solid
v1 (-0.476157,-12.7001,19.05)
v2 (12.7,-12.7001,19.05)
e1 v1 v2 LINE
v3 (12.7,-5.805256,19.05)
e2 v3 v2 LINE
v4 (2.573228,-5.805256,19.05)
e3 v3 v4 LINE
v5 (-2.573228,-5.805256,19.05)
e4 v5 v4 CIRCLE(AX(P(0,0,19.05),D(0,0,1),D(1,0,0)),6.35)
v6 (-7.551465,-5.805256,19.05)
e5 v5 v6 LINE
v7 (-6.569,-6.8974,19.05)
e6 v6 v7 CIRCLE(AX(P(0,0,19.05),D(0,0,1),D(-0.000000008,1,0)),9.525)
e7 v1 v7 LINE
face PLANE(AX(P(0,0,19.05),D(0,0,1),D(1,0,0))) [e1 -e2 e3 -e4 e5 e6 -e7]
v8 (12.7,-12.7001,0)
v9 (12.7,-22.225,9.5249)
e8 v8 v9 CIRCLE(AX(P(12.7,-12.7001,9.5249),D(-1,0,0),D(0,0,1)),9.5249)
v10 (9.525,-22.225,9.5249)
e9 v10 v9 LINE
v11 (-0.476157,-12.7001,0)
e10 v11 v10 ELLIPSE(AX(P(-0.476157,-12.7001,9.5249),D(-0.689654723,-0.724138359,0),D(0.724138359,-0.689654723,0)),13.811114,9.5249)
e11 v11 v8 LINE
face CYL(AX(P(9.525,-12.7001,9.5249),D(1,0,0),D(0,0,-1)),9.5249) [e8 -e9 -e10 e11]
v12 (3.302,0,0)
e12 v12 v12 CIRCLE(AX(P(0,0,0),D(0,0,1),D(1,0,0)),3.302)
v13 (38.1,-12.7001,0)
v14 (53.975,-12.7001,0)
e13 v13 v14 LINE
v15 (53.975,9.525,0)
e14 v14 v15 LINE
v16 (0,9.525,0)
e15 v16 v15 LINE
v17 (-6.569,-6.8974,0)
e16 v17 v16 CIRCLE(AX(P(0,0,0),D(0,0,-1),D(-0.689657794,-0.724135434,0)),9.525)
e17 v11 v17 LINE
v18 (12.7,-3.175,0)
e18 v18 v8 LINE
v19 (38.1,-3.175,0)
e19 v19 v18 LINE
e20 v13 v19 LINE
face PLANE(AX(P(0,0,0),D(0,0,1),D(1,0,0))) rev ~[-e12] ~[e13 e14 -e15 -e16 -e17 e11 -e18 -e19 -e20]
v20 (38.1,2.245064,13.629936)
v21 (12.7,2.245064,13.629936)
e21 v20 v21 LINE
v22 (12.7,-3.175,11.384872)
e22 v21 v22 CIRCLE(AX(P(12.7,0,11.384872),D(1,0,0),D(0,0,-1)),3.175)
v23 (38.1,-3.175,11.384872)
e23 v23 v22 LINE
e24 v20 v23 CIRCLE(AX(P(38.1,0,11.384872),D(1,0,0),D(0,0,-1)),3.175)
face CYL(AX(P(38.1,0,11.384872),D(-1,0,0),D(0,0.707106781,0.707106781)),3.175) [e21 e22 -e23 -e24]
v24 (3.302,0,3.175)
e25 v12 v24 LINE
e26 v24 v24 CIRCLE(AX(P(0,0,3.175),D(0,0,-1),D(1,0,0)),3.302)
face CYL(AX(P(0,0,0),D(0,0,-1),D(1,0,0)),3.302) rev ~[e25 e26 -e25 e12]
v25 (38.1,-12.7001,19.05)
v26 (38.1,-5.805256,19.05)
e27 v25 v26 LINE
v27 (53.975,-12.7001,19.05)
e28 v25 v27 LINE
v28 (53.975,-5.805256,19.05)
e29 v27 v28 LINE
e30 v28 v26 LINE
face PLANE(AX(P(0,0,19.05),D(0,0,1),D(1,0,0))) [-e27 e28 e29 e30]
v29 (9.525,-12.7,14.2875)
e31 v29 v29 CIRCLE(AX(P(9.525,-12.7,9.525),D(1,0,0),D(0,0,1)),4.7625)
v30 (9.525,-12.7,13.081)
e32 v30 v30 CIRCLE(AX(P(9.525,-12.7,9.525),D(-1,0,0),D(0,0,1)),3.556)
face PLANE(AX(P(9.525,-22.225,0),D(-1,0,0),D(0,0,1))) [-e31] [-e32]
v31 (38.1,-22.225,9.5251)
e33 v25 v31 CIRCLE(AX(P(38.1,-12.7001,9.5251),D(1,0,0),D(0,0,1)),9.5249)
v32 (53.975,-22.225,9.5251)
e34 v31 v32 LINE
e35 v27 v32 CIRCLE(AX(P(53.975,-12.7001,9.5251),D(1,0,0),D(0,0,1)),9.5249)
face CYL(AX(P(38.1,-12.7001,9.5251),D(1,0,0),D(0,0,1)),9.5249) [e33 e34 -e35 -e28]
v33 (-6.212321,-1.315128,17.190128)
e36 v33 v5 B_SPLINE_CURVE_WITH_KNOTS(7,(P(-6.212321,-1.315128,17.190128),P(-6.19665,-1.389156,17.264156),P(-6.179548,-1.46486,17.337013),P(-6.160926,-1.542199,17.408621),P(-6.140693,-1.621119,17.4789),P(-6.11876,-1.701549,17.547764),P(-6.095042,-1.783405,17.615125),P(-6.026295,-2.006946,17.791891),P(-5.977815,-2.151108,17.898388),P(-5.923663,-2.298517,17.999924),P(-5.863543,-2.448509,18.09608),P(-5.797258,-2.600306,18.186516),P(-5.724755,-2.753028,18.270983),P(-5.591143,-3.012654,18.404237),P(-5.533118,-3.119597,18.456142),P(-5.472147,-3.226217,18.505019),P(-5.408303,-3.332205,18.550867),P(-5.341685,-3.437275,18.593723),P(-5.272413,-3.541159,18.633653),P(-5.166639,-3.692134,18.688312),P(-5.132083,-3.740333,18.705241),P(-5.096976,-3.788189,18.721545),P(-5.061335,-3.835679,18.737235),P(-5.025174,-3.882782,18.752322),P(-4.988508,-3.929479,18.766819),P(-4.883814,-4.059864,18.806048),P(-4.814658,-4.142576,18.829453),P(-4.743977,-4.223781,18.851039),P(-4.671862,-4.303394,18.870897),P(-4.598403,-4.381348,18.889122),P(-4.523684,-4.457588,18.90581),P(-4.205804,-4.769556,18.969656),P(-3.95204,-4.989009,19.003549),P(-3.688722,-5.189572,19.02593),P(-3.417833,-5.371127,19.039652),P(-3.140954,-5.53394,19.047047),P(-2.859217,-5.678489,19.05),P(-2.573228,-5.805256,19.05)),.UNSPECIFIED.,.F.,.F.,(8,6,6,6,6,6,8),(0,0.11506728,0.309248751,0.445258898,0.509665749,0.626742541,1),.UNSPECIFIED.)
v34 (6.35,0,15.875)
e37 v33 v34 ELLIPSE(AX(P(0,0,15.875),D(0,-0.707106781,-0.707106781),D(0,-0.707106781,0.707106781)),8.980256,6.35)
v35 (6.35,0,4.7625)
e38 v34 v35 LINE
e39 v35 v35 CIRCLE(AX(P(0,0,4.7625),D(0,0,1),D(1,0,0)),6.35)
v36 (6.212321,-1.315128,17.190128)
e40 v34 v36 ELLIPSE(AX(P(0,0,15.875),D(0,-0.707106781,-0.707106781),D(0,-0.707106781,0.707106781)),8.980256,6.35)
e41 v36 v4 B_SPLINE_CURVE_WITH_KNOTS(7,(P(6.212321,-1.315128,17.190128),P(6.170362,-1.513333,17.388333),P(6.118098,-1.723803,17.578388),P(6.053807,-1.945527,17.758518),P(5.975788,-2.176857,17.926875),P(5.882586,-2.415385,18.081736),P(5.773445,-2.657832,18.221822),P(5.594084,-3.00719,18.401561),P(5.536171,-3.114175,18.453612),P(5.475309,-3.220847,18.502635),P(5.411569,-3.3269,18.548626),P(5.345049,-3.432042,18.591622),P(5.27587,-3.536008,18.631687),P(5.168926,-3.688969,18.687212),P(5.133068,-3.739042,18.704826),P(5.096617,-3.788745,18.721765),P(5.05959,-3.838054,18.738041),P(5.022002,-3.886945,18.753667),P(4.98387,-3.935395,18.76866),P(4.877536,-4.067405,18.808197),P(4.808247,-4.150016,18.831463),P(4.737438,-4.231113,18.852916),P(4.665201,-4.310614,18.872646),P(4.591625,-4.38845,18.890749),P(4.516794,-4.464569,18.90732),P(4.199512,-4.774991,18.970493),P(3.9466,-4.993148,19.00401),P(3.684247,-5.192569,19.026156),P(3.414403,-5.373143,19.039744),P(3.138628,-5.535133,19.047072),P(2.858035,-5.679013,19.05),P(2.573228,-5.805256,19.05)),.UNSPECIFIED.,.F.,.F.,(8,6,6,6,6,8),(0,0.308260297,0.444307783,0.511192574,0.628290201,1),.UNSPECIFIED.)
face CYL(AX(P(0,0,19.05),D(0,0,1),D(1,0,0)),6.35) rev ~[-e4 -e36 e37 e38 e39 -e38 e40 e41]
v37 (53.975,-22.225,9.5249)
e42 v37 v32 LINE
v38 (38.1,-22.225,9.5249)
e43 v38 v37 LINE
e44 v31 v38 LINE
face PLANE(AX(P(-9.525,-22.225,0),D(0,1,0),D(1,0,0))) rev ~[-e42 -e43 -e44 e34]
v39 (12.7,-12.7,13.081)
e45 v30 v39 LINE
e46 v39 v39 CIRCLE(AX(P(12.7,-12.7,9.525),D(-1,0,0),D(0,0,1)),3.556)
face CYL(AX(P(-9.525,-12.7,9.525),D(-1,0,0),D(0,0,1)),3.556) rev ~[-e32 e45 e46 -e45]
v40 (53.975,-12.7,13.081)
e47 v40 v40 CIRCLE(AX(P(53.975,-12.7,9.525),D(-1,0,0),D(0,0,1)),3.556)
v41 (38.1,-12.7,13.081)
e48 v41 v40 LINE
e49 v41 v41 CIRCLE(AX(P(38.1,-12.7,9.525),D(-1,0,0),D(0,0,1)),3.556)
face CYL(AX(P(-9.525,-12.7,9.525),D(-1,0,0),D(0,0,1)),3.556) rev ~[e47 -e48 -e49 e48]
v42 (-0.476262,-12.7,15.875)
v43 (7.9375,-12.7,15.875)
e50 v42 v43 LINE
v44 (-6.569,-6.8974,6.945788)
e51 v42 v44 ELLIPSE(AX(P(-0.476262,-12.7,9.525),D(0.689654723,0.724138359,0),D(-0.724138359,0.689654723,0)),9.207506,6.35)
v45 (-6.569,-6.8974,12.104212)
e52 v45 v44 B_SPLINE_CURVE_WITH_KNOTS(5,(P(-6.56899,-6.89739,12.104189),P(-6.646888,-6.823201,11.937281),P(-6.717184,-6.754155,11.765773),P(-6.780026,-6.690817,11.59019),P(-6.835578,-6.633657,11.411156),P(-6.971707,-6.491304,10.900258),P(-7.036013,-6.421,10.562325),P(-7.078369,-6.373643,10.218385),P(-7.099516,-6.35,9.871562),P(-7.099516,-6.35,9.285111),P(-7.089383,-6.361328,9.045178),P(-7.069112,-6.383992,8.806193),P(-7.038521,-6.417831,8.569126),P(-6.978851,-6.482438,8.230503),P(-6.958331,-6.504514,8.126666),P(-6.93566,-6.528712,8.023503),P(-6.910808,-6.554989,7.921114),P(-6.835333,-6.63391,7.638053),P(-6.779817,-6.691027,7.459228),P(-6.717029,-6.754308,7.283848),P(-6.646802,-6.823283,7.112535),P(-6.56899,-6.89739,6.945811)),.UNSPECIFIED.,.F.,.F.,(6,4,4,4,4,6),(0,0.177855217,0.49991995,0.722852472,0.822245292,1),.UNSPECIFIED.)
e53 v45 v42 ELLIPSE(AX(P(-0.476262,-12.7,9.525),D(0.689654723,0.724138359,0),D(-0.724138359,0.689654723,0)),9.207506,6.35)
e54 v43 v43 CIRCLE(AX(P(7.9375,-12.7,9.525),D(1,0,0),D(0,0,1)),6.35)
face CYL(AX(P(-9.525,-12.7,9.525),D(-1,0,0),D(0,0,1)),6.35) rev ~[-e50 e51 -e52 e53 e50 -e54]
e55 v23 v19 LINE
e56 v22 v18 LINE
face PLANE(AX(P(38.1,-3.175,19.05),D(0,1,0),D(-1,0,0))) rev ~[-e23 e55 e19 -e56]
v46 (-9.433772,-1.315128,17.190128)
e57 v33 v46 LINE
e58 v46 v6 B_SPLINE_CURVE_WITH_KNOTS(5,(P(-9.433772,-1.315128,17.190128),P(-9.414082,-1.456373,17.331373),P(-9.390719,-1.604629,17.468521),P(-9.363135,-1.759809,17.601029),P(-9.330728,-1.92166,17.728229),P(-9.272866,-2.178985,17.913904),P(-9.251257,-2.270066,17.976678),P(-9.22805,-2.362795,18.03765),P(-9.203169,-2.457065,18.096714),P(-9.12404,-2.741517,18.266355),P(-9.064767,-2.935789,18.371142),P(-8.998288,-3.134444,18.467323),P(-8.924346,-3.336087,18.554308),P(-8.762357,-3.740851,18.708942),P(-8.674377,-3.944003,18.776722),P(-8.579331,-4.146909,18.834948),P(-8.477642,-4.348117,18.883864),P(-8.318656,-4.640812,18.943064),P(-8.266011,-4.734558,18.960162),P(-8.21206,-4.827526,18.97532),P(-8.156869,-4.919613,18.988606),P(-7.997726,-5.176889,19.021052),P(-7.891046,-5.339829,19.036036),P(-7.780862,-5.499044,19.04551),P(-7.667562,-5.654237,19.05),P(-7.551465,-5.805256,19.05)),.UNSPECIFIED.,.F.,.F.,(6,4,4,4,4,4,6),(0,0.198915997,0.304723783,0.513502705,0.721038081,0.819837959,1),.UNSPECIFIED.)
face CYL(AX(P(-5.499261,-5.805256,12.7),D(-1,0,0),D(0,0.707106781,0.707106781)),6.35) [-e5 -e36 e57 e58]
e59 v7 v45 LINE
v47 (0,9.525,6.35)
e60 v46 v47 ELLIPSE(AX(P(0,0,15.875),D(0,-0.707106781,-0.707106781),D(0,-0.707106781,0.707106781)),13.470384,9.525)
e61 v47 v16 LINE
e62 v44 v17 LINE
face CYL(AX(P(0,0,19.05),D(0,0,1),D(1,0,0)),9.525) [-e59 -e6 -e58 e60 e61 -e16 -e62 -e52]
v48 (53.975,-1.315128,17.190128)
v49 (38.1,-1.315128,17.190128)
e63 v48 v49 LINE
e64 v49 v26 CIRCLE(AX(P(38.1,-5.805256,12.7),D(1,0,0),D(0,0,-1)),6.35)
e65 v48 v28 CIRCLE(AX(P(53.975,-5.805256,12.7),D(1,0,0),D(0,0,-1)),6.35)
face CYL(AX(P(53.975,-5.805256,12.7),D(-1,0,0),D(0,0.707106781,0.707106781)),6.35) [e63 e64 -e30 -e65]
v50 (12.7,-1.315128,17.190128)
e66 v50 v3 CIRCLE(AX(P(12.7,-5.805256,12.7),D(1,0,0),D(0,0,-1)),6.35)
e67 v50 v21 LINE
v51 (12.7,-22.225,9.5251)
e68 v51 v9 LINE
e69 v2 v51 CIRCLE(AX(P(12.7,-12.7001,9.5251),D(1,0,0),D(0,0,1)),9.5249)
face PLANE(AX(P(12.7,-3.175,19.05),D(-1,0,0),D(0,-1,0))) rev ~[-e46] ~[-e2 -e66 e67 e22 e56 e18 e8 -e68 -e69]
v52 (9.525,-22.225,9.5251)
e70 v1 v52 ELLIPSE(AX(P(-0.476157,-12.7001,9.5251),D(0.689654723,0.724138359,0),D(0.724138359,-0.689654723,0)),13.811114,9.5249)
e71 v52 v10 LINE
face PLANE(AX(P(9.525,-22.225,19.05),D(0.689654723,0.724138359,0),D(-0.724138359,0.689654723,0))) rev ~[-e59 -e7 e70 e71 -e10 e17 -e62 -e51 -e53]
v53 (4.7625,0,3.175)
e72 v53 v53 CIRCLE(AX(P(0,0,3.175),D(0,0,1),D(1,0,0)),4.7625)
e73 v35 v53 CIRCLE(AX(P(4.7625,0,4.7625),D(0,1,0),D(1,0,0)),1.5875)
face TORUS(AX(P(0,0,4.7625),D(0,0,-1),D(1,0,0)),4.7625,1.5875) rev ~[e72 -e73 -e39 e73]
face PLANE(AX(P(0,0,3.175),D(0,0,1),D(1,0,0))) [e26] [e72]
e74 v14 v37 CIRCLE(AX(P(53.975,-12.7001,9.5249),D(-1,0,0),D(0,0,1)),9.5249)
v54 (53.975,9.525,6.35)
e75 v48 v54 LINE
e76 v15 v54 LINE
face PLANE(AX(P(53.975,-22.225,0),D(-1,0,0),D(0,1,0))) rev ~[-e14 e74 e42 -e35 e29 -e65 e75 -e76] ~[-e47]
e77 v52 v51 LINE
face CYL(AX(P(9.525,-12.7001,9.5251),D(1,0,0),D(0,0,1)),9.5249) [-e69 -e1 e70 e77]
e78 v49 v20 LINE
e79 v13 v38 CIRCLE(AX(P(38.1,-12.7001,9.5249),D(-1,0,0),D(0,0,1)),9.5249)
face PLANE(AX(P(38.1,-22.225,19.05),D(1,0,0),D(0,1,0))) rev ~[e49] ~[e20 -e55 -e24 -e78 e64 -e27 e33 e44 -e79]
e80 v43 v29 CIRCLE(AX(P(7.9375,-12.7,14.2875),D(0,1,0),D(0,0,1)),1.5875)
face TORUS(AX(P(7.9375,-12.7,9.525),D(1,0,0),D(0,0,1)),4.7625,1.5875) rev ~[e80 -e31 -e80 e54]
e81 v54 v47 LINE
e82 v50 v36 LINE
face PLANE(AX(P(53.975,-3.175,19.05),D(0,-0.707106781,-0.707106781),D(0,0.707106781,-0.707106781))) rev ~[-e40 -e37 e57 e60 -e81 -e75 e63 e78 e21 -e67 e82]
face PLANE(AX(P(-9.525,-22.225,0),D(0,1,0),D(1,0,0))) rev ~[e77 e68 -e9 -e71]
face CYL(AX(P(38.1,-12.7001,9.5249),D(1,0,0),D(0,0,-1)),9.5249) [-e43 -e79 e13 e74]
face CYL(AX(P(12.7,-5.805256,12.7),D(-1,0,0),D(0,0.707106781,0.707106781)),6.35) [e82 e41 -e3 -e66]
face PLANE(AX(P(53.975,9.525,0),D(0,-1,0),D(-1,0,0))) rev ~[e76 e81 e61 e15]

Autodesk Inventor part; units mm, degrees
ref_plane "YZ Plane" through (0, 0, 0) normal (1, 0, 0) x (0, 1, 0)
ref_plane "XZ Plane" through (0, 0, 0) normal (0, 1, 0) x (-1, 0, 0)
ref_plane "XY Plane" through (0, 0, 0) normal (0, 0, 1) x (1, 0, 0)
sketch "Sketch18" plane through (0, 0, 0) normal (0, 0, 1) x (1, 0, 0)
  circle A0 centre (0, 0) radius 3.302
  circle A1 centre (0, 0) radius 9.525
  line L0 (-9.525, -22.225) -> (53.975, -22.225)
  line L1 (53.975, -22.225) -> (53.975, 9.525)
  line L2 (53.975, 9.525) -> (-9.525, 9.525)
  line L3 (-9.525, 9.525) -> (-9.525, -22.225)
  dimension "d100" = 6.604
  dimension "d101" = 19.05
  dimension "d102" = 63.5
  dimension "d103" = 31.75
extrude "Extrusion17" add sketch "Sketch18" along normal blind 19.05
sketch "Sketch19" plane through (-9.525, -22.225, 0) normal (-1, 0, 0) x (0, 0, 1)
  circle A0 centre (9.525, 9.525) radius 9.525 construction
  circle A1 centre (9.525, 9.525) radius 3.556
  line L0 (0, 31.75) -> (0, 0) projected
  line L1 (0, 0) -> (19.05, 0) projected
  point P0 (0, 22.225)
  dimension "d106" = 19.05
  dimension "d107" = 7.112
extrude "Extrusion18" cut sketch "Sketch19" against normal through all
sketch "Sketch20" plane through (0, 0, 19.05) normal (0, 0, 1) x (1, 0, 0)
  line L0 (12.7, -41.275) -> (38.1, -41.275)
  line L1 (38.1, -41.275) -> (38.1, -3.175)
  line L2 (38.1, -3.175) -> (12.7, -3.175)
  line L3 (12.7, -3.175) -> (12.7, -41.275)
  line L4 (-9.525, -22.225) -> (53.975, -22.225) projected
  line L5 (12.7, -41.275) -> (38.1, -3.175) construction
  line L6 (38.1, -41.275) -> (12.7, -3.175) construction
  circle A0 centre (0, 0) radius 3.302 projected
  point P0 (25.4, -22.225)
  point P1 (12.7, -22.225)
  point P2 (38.1, -22.225)
  dimension "d110" = 25.4
  dimension "d111" = 38.1
  dimension "d112" = 12.7
extrude "Extrusion19" cut sketch "Sketch20" against normal through all contours L3 L2 L1 L4
sketch "Sketch21" plane through (-9.525, -22.225, 0) normal (-1, 0, 0) x (0, 0, 1)
  circle A0 centre (9.525, 9.525) radius 3.556 projected
  circle A1 centre (9.525, 9.525) radius 6.35
  line L0 (3.175, -9.525) -> (15.875, -9.525)
  line L1 (15.875, -9.525) -> (15.875, 9.525)
  line L2 (15.875, 9.525) -> (3.175, 9.525) construction
  line L3 (3.175, 9.525) -> (3.175, -9.525)
  line L4 (19.05, 0) -> (0, 0) projected
  line L5 (3.175, -9.525) -> (15.875, 9.525) construction
  line L6 (15.875, -9.525) -> (3.175, 9.525) construction
  point P0 (0, 22.225)
  point P1 (9.525, 0)
  point P2 (3.175, 0)
  point P3 (15.875, 0)
  point P4 (3.175, 9.525)
  dimension "d115" = 12.7
extrude "Extrusion20" cut sketch "Sketch21" against normal blind 19.05 contours A1
sketch "Sketch22" plane through (0, 0, 19.05) normal (0, 0, 1) x (1, 0, 0)
  circle A0 centre (0, 0) radius 9.525
  line L0 (-9.525, 9.525) -> (-9.525, -22.225) projected
  line L1 (9.525, -22.225) -> (-9.525, -22.225) projected
  line L2 (9.525, -22.225) -> (-6.569, -6.8974)
  line L3 (12.7, -22.225) -> (12.7, -3.175) projected
  line L4 (53.975, 9.525) -> (-9.525, 9.525) projected
  point P0 (-9.525, 0)
  point P1 (0, 9.525)
  dimension "d118" = 3.175
extrude "Extrusion21" cut sketch "Sketch22" against normal through all contours L2 L1 L0 A0 | L0 L4 A0
fillet "Fillet12" radius 1.5875 1 edges at (9.525, -12.7, 3.175)
fillet "Fillet13" radius 9.525 4 edges at (11.1125, -22.225, 19.05) (11.1125, -22.225, 0) (46.0375, -22.225, 19.05) (46.0375, -22.225, 0)
sketch "Sketch25" plane through (53.975, 9.525, 19.05) normal (1, 0, 0) x (0, 0, -1)
  line L0 (0, -22.225) -> (0, -12.7) projected
  line L1 (0, -12.7) -> (12.7, 0)
  line L2 (19.05, 0) -> (0, 0) projected
  line L3 (0, -22.225) -> (0, 0) projected
  point P0 (19.05, -9.525)
  dimension "d131" = 6.35
extrude "Extrusion24" cut sketch "Sketch25" against normal through all
sketch "Sketch26" plane through (0, 0, 19.05) normal (0, 0, 1) x (1, 0, 0)
  circle A0 centre (0, 0) radius 6.35
  dimension "d134" = 12.7
extrude "Extrusion25" cut sketch "Sketch26" against normal blind 15.875
fillet "Fillet16" radius 3.175 1 edges at (25.4, -3.175, 19.05)
fillet "Fillet17" radius 6.35 3 edges at (9.0996, -3.175, 19.05) (-7.2398, -3.175, 19.05) (46.0375, -3.175, 19.05)
fillet "Fillet18" radius 1.5875 1 edges at (-6.35, 0, 3.175)
properties part number "Mod Mount" material "UHMW, White"
